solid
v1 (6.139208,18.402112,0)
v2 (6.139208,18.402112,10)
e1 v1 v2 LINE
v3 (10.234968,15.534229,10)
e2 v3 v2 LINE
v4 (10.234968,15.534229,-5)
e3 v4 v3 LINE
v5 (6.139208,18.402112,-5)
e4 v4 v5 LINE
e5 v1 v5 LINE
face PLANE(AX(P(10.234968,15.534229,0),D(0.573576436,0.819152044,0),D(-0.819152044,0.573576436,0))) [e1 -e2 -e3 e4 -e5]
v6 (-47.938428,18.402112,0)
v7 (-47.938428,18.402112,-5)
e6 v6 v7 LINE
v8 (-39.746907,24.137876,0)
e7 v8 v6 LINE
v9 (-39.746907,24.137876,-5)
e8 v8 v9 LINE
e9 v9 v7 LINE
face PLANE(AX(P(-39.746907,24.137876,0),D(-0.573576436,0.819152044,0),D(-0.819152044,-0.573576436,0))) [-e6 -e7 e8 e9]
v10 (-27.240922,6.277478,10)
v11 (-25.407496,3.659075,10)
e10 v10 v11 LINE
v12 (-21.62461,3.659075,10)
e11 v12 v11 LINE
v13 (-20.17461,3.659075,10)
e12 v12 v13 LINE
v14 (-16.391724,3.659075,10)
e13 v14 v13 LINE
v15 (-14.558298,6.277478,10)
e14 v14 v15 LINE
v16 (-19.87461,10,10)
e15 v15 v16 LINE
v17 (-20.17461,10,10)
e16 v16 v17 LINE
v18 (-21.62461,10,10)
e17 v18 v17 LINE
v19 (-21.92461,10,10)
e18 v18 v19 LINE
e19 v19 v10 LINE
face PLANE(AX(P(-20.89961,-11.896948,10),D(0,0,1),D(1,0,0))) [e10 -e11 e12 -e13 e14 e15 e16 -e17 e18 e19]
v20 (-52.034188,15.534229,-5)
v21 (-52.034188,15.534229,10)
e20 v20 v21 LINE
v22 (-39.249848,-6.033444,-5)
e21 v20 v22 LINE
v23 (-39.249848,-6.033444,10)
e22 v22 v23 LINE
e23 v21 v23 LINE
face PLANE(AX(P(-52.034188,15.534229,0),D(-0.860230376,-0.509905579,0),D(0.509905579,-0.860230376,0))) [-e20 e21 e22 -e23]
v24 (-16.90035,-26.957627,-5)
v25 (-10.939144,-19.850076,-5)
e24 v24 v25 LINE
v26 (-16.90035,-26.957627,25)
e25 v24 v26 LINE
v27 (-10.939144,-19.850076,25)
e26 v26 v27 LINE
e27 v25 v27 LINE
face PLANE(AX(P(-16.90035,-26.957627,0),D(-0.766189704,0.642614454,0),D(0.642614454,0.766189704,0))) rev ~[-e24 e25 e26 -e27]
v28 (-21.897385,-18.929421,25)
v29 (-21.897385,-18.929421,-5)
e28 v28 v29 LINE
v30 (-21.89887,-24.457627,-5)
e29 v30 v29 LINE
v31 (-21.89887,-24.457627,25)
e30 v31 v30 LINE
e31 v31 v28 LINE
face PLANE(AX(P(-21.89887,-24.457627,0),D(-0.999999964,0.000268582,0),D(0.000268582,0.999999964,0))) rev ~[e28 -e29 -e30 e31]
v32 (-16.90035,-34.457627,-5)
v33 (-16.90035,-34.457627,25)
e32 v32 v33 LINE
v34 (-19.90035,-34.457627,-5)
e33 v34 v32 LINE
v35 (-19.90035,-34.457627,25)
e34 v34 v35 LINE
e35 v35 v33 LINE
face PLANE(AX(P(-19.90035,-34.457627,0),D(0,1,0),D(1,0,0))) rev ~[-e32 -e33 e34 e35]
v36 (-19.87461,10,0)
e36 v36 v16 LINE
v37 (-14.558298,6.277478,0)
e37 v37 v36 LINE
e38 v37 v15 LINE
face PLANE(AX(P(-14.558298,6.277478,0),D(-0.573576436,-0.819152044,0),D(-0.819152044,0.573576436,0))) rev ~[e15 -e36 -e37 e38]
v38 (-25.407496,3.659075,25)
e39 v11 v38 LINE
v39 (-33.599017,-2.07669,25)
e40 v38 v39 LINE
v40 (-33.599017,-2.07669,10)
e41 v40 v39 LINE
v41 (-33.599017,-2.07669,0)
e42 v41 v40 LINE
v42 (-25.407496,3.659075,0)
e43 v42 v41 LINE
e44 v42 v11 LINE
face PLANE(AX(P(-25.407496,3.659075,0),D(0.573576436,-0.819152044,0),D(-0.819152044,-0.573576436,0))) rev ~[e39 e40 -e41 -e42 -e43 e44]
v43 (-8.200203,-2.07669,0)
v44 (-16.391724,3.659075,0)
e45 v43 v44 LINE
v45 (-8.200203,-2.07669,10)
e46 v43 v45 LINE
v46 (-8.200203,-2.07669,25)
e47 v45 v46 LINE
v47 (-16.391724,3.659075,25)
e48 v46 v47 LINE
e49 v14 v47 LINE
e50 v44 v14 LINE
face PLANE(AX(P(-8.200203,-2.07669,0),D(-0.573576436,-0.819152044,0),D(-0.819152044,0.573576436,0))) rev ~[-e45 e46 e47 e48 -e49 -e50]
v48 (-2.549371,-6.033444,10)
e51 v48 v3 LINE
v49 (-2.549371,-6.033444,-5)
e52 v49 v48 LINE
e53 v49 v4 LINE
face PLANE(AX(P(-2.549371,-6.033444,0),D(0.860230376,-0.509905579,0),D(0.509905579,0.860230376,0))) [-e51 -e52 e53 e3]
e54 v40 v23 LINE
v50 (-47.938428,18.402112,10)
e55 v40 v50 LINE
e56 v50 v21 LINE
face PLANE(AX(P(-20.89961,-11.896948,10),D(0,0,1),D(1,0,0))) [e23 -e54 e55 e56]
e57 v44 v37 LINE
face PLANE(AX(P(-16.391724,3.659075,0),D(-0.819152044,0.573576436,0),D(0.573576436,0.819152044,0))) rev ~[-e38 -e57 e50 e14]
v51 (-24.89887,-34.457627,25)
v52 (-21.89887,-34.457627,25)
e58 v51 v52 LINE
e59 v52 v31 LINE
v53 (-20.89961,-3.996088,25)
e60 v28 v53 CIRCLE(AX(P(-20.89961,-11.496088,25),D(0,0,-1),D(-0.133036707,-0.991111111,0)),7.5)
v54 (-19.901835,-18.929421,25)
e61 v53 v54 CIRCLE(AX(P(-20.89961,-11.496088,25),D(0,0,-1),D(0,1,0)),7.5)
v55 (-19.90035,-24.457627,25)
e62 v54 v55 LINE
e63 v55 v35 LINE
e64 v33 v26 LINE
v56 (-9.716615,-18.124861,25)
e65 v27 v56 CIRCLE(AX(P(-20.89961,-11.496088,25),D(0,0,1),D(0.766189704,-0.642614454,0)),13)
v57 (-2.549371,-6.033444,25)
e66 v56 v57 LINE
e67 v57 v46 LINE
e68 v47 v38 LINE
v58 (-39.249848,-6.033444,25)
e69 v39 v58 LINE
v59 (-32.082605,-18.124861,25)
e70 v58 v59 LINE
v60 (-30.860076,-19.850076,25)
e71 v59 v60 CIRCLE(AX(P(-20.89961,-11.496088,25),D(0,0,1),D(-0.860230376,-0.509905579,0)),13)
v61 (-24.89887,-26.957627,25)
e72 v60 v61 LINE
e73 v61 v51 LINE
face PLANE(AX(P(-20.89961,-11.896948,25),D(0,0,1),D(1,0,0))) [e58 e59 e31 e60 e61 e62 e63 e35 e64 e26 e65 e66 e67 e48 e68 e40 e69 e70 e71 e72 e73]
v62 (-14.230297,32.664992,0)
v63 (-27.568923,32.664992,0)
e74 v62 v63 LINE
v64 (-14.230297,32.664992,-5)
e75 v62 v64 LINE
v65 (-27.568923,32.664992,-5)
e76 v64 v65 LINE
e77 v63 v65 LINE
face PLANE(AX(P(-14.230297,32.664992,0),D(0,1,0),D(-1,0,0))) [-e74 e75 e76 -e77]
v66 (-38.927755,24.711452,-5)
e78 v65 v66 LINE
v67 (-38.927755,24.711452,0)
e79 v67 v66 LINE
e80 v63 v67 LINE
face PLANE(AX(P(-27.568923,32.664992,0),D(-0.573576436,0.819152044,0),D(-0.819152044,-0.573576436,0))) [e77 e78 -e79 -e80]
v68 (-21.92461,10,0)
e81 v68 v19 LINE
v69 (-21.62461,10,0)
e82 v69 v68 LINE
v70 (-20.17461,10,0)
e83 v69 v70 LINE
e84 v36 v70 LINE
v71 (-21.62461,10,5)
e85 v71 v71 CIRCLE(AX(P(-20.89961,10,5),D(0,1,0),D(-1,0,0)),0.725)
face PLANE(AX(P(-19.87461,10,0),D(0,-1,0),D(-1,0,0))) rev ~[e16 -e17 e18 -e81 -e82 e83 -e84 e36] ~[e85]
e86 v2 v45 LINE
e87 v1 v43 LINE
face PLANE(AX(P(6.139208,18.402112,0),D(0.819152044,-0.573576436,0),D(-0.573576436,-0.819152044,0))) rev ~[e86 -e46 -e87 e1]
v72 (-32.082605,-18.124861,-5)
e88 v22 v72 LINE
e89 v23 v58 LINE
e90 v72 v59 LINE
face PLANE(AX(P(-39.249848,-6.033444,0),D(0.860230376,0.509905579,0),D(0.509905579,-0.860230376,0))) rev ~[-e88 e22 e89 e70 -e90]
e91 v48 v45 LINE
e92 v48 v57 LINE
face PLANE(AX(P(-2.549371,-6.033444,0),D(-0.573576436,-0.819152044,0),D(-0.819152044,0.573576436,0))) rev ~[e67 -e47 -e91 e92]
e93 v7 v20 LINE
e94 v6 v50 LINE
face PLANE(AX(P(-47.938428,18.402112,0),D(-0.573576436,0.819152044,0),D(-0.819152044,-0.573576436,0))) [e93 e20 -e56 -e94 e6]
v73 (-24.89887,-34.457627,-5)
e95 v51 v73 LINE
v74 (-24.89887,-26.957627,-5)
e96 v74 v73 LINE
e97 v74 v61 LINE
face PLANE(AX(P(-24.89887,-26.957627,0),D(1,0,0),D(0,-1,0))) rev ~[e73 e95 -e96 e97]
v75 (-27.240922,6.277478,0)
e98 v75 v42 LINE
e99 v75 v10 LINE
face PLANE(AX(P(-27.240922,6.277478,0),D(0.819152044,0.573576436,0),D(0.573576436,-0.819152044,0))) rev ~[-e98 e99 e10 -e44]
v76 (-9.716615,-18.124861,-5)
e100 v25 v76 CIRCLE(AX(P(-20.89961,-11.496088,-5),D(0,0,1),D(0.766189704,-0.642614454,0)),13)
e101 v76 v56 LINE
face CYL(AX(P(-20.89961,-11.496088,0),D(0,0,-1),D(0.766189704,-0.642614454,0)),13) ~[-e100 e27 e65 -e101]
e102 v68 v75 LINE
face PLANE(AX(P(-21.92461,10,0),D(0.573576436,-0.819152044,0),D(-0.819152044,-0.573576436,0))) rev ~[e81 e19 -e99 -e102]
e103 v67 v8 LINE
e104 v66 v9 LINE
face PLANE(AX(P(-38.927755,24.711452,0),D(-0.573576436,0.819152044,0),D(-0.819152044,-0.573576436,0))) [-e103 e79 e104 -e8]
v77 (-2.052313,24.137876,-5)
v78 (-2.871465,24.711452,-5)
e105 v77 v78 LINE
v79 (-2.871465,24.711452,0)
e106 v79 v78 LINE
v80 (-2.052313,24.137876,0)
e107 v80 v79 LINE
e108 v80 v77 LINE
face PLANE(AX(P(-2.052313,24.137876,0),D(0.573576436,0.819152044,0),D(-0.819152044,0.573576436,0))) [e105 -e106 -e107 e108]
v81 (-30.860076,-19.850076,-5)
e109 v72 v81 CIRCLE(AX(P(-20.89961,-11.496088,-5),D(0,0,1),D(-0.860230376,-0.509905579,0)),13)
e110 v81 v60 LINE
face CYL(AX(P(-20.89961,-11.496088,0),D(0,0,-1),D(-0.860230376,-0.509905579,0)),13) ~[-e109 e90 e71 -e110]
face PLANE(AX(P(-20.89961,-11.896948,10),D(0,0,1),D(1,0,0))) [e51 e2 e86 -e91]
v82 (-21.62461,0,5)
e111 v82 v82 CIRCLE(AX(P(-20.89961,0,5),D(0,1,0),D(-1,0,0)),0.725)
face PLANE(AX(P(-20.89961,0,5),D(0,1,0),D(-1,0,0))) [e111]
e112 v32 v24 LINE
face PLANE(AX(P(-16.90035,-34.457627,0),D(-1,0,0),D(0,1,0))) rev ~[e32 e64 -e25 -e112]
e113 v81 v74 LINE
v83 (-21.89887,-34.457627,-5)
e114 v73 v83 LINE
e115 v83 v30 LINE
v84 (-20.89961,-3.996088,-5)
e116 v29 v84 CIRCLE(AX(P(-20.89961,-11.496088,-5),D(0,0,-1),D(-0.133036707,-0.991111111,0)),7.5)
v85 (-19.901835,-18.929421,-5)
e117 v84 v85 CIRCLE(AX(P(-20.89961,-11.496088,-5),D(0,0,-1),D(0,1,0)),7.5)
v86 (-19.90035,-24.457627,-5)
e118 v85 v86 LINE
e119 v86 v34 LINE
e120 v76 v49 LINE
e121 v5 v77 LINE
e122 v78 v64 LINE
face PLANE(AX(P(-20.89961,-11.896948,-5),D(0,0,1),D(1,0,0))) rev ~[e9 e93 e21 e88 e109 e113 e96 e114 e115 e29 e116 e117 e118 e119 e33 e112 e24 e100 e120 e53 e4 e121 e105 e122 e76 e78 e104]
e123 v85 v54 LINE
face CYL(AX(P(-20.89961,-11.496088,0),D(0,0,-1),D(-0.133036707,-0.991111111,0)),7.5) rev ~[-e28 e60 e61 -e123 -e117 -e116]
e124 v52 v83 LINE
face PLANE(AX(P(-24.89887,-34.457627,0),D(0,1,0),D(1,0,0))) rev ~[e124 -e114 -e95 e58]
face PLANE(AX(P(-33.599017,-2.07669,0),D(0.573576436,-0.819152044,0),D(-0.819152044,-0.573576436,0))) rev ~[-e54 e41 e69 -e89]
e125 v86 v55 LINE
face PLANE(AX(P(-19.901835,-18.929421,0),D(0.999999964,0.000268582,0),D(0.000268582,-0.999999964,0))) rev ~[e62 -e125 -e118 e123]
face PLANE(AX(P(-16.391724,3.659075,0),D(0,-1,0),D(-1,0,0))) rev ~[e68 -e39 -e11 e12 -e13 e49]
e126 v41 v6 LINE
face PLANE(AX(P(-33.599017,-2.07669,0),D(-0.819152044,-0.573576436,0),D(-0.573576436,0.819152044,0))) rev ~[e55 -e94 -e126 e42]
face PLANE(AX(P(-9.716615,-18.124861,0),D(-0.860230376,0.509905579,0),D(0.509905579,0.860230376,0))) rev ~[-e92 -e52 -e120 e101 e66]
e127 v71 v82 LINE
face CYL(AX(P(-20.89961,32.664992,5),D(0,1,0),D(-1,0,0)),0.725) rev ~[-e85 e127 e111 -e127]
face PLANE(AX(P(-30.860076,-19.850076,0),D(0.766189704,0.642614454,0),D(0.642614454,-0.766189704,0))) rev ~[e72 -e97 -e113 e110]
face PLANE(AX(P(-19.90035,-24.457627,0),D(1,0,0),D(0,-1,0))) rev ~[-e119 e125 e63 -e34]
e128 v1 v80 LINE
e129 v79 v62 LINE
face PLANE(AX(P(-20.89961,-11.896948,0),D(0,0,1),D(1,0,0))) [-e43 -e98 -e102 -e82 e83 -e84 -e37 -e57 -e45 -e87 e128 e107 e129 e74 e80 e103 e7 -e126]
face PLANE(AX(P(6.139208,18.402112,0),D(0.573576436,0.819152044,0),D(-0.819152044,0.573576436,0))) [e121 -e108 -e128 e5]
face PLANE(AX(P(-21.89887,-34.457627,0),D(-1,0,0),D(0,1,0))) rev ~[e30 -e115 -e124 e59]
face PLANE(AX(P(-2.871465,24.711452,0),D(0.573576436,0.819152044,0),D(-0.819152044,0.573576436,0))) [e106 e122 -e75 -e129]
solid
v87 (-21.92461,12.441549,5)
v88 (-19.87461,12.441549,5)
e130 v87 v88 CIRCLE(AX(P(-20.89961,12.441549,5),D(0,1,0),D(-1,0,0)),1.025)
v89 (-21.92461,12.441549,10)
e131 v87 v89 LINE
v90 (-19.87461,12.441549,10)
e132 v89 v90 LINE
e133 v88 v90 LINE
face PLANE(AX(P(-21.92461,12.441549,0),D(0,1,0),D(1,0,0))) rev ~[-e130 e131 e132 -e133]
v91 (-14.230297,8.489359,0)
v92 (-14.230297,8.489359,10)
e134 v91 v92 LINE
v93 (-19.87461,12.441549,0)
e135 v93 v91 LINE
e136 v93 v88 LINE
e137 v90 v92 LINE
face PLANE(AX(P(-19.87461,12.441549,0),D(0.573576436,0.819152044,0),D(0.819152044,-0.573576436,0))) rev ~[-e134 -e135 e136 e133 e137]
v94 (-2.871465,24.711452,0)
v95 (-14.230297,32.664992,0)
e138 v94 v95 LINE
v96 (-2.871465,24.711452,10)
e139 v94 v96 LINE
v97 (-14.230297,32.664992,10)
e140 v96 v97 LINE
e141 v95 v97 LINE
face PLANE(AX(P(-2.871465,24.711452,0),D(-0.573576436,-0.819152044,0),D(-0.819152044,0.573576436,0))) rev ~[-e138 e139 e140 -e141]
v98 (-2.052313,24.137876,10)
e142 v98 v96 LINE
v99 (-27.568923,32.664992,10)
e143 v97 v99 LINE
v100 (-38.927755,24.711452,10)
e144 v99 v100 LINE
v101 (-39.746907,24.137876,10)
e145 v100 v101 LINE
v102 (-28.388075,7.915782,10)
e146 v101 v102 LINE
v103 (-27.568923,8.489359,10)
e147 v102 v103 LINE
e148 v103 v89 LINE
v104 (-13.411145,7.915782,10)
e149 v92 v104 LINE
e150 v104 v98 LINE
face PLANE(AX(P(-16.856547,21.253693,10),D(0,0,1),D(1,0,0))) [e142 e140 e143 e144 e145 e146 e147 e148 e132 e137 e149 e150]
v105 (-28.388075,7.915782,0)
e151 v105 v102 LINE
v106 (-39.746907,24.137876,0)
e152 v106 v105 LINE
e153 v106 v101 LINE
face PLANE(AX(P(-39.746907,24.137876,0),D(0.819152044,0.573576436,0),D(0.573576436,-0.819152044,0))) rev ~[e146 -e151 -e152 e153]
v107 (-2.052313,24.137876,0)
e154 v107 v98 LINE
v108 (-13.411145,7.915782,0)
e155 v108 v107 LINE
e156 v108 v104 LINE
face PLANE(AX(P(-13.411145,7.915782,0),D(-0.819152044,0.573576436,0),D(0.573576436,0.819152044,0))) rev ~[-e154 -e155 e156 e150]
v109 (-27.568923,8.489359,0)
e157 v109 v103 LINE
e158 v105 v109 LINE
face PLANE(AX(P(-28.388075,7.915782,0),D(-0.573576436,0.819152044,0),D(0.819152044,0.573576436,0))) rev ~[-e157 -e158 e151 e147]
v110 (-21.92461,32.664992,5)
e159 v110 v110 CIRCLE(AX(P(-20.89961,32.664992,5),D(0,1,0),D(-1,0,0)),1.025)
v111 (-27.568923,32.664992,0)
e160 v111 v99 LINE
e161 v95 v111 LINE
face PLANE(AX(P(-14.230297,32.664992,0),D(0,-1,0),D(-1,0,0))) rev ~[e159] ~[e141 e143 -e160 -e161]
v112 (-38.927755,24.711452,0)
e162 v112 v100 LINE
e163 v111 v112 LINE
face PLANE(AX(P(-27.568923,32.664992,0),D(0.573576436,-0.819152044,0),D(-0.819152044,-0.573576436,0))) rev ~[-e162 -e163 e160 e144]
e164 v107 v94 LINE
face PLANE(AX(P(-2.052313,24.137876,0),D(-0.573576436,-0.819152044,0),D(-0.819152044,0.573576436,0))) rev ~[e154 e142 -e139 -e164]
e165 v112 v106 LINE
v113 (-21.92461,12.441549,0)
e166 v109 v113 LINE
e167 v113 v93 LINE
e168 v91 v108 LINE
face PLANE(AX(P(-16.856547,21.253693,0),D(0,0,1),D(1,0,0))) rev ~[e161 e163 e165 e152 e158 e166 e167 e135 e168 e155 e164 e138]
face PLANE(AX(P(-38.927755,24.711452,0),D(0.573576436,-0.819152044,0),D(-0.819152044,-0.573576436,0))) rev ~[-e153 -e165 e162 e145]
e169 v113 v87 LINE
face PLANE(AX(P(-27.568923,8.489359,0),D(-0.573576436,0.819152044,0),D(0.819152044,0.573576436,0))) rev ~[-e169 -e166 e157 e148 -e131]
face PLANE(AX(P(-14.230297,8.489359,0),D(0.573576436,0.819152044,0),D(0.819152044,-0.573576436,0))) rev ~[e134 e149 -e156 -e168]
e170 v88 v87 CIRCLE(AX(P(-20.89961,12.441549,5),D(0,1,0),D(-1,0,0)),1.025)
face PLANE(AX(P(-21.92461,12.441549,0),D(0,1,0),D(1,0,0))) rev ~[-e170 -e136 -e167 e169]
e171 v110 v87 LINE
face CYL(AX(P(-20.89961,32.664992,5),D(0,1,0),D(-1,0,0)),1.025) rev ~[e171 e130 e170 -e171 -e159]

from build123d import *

# Parameters (mm, degrees)
F1_W     = 1.45
F1_H     = 6.3409252325
F2_DEPTH = 5
F3_DEPTH = 10
F5_DEPTH = 25
F6_DEPTH = 10
F4_R     = 0.725
F7_DEPTH = 32.664992266
F4_R_2   = 1.025
F8_DEPTH = 20.2234430885


# Not quite as in the source:
# - a feature names something its author has since deleted; it is built from what else it names


with BuildPart() as f2:
    # F1 (on Top) → F2 (new body)
    with BuildSketch(Plane.XY):
        with BuildLine():
            ThreePointArc((-21.8973851311, -18.9294214119), (-28.3829246015, -10.9960880786), (-20.899609828, -3.9960880786))
            ThreePointArc((-20.899609828, -3.9960880786), (-13.4162950544, -10.9960880786), (-19.9018345249, -18.9294214119))
            Line((-19.9018345249, -18.9294214119), (-19.9003497467, -24.4576265402))
            ThreePointArc((-19.9003497467, -24.4576265402), (-18.3828834375, -24.250149717), (-16.9003497467, -23.8656442066))
            ThreePointArc((-16.9003497467, -23.8656442066), (-13.6367119074, -22.2780319569), (-10.9391436703, -19.8500759839))
            ThreePointArc((-10.9391436703, -19.8500759839), (-10.2927451499, -19.0123651957), (-9.7166149372, -18.12486061))
            ThreePointArc((-9.7166149372, -18.12486061), (-9.4290474991, -5.3783924455), (-20.174609828, 1.4836798315))
            Line((-20.174609828, 1.4836798315), (-20.174609828, 0))
            Line((-20.174609828, 0), (-20.899609828, 0))
            Line((-20.899609828, 0), (-21.624609828, 0))
            Line((-21.624609828, 0), (-21.624609828, 1.4836798315))
            ThreePointArc((-21.624609828, 1.4836798315), (-32.3701721569, -5.3783924455), (-32.0826047188, -18.12486061))
            ThreePointArc((-32.0826047188, -18.12486061), (-31.5064745061, -19.0123651957), (-30.8600759857, -19.8500759839))
            ThreePointArc((-30.8600759857, -19.8500759839), (-28.1625077486, -22.2780319569), (-24.8988699093, -23.8656442066))
            ThreePointArc((-24.8988699093, -23.8656442066), (-23.4163362185, -24.250149717), (-21.8988699093, -24.4576265402))
            Line((-21.8988699093, -24.4576265402), (-21.8973851311, -18.9294214119))
        make_face()
        with BuildLine():
            Line((-21.8988699093, -34.4576265402), (-21.8988699093, -24.4576265402))
            ThreePointArc((-21.8988699093, -24.4576265402), (-23.4163362185, -24.250149717), (-24.8988699093, -23.8656442066))
            Line((-24.8988699093, -23.8656442066), (-24.8988699093, -26.9576265402))
            Line((-24.8988699093, -26.9576265402), (-24.8988699093, -34.4576265402))
            Line((-24.8988699093, -34.4576265402), (-21.8988699093, -34.4576265402))
        make_face()
        with BuildLine():
            ThreePointArc((-16.9003497467, -23.8656442066), (-18.3828834375, -24.250149717), (-19.9003497467, -24.4576265402))
            Line((-19.9003497467, -24.4576265402), (-19.9003497467, -34.4576265402))
            Line((-19.9003497467, -34.4576265402), (-16.9003497467, -34.4576265402))
            Line((-16.9003497467, -34.4576265402), (-16.9003497467, -26.9576265402))
            Line((-16.9003497467, -26.9576265402), (-16.9003497467, -23.8656442066))
        make_face()
        with BuildLine():
            Line((-24.8988699093, -26.9576265402), (-24.8988699093, -23.8656442066))
            ThreePointArc((-24.8988699093, -23.8656442066), (-28.1625077486, -22.2780319569), (-30.8600759857, -19.8500759839))
            Line((-30.8600759857, -19.8500759839), (-24.8988699093, -26.9576265402))
        make_face()
        with BuildLine():
            ThreePointArc((-10.9391436703, -19.8500759839), (-13.6367119074, -22.2780319569), (-16.9003497467, -23.8656442066))
            Line((-16.9003497467, -23.8656442066), (-16.9003497467, -26.9576265402))
            Line((-16.9003497467, -26.9576265402), (-10.9391436703, -19.8500759839))
        make_face()
        with BuildLine():
            Line((-39.2498481908, -6.0334444768), (-32.0826047188, -18.12486061))
            ThreePointArc((-32.0826047188, -18.12486061), (-32.3701721569, -5.3783924455), (-21.624609828, 1.4836798315))
            Line((-21.624609828, 1.4836798315), (-21.624609828, 3.6590747675))
            Line((-21.624609828, 3.6590747675), (-25.4074961518, 3.6590747675))
            Line((-25.4074961518, 3.6590747675), (-33.5990165947, -2.076689596))
            Line((-33.5990165947, -2.076689596), (-39.2498481908, -6.0334444768))
        make_face()
        with BuildLine():
            ThreePointArc((-20.174609828, 1.4836798315), (-9.4290474991, -5.3783924455), (-9.7166149372, -18.12486061))
            Line((-9.7166149372, -18.12486061), (-2.5493714652, -6.0334444768))
            Line((-2.5493714652, -6.0334444768), (-8.2002030613, -2.076689596))
            Line((-8.2002030613, -2.076689596), (-16.3917235042, 3.6590747675))
            Line((-16.3917235042, 3.6590747675), (-20.174609828, 3.6590747675))
            Line((-20.174609828, 3.6590747675), (-20.174609828, 1.4836798315))
        make_face()
        with BuildLine():
            Line((-21.624609828, 3.6590747675), (-21.624609828, 1.4836798315))
            ThreePointArc((-21.624609828, 1.4836798315), (-21.2622509514, 1.4988529145), (-20.899609828, 1.5039119214))
            ThreePointArc((-20.899609828, 1.5039119214), (-20.5369687046, 1.4988529145), (-20.174609828, 1.4836798315))
            Line((-20.174609828, 1.4836798315), (-20.174609828, 3.6590747675))
            Line((-20.174609828, 3.6590747675), (-21.624609828, 3.6590747675))
        make_face()
        with BuildLine():
            ThreePointArc((-20.899609828, 1.5039119214), (-21.2622509514, 1.4988529145), (-21.624609828, 1.4836798315))
            Line((-21.624609828, 1.4836798315), (-21.624609828, 0))
            Line((-21.624609828, 0), (-20.899609828, 0))
            Line((-20.899609828, 0), (-20.174609828, 0))
            Line((-20.174609828, 0), (-20.174609828, 1.4836798315))
            ThreePointArc((-20.174609828, 1.4836798315), (-20.5369687046, 1.4988529145), (-20.899609828, 1.5039119214))
        make_face()
        Polygon((-52.0341877249, 15.5342293294), (-39.2498481908, -6.0334444768), (-33.5990165947, -2.076689596), (-47.9384275035, 18.4021115112), align=None)
        Polygon((-8.2002030613, -2.076689596), (-2.5493714652, -6.0334444768), (10.2349680689, 15.5342293294), (6.1392078475, 18.4021115112), align=None)
        Polygon((-25.4074961518, 3.6590747675), (-21.624609828, 3.6590747675), (-21.624609828, 10), (-21.924609828, 10), (-27.2409219547, 6.2774781734), align=None)
        with Locations((-20.899609828, 6.8295373837)):
            Rectangle(F1_W, F1_H)
        Polygon((-47.9384275035, 18.4021115112), (-33.5990165947, -2.076689596), (-25.4074961518, 3.6590747675), (-27.2409219547, 6.2774781734), (-28.3880748274, 7.915782262), (-39.7469070606, 24.1378758747), align=None)
        Polygon((-16.3917235042, 3.6590747675), (-8.2002030613, -2.076689596), (6.1392078475, 18.4021115112), (-2.0523125954, 24.1378758747), (-13.4111448286, 7.915782262), (-14.5582977013, 6.2774781734), align=None)
        Polygon((-20.174609828, 10), (-20.174609828, 3.6590747675), (-16.3917235042, 3.6590747675), (-14.5582977013, 6.2774781734), (-19.874609828, 10), align=None)
        Polygon((-21.924609828, 10), (-21.624609828, 10), (-20.174609828, 10), (-19.874609828, 10), (-19.874609828, 12.4415491775), (-21.924609828, 12.4415491775), align=None)
        Polygon((-27.2409219547, 6.2774781734), (-21.924609828, 10), (-21.924609828, 12.4415491775), (-27.5689227831, 8.4893586983), (-28.3880748274, 7.915782262), align=None)
        Polygon((-38.9277550163, 24.7114523111), (-39.7469070606, 24.1378758747), (-28.3880748274, 7.915782262), (-27.5689227831, 8.4893586983), (-27.5689227831, 32.664992266), align=None)
        Polygon((-13.4111448286, 7.915782262), (-2.0523125954, 24.1378758747), (-2.8714646397, 24.7114523111), (-14.2302968729, 32.664992266), (-14.2302968729, 8.4893586983), align=None)
        Polygon((-19.874609828, 10), (-14.5582977013, 6.2774781734), (-13.4111448286, 7.915782262), (-14.2302968729, 8.4893586983), (-19.874609828, 12.4415491775), align=None)
        Polygon((-27.5689227831, 8.4893586983), (-21.924609828, 12.4415491775), (-21.924609828, 32.664992266), (-27.5689227831, 32.664992266), align=None)
        Polygon((-21.924609828, 32.664992266), (-21.924609828, 12.4415491775), (-19.874609828, 12.4415491775), (-19.874609828, 32.664992266), (-20.899609828, 32.664992266), align=None)
        Polygon((-19.874609828, 32.664992266), (-19.874609828, 12.4415491775), (-14.2302968729, 8.4893586983), (-14.2302968729, 32.664992266), align=None)
    extrude(amount=-F2_DEPTH)

    # F1 (on Top) → F5 (join)
    with BuildSketch(Plane.XY):
        with BuildLine():
            ThreePointArc((-21.8973851311, -18.9294214119), (-28.3829246015, -10.9960880786), (-20.899609828, -3.9960880786))
            ThreePointArc((-20.899609828, -3.9960880786), (-13.4162950544, -10.9960880786), (-19.9018345249, -18.9294214119))
            Line((-19.9018345249, -18.9294214119), (-19.9003497467, -24.4576265402))
            ThreePointArc((-19.9003497467, -24.4576265402), (-18.3828834375, -24.250149717), (-16.9003497467, -23.8656442066))
            ThreePointArc((-16.9003497467, -23.8656442066), (-13.6367119074, -22.2780319569), (-10.9391436703, -19.8500759839))
            ThreePointArc((-10.9391436703, -19.8500759839), (-10.2927451499, -19.0123651957), (-9.7166149372, -18.12486061))
            ThreePointArc((-9.7166149372, -18.12486061), (-9.4290474991, -5.3783924455), (-20.174609828, 1.4836798315))
            Line((-20.174609828, 1.4836798315), (-20.174609828, 0))
            Line((-20.174609828, 0), (-20.899609828, 0))
            Line((-20.899609828, 0), (-21.624609828, 0))
            Line((-21.624609828, 0), (-21.624609828, 1.4836798315))
            ThreePointArc((-21.624609828, 1.4836798315), (-32.3701721569, -5.3783924455), (-32.0826047188, -18.12486061))
            ThreePointArc((-32.0826047188, -18.12486061), (-31.5064745061, -19.0123651957), (-30.8600759857, -19.8500759839))
            ThreePointArc((-30.8600759857, -19.8500759839), (-28.1625077486, -22.2780319569), (-24.8988699093, -23.8656442066))
            ThreePointArc((-24.8988699093, -23.8656442066), (-23.4163362185, -24.250149717), (-21.8988699093, -24.4576265402))
            Line((-21.8988699093, -24.4576265402), (-21.8973851311, -18.9294214119))
        make_face()
        with BuildLine():
            Line((-21.8988699093, -34.4576265402), (-21.8988699093, -24.4576265402))
            ThreePointArc((-21.8988699093, -24.4576265402), (-23.4163362185, -24.250149717), (-24.8988699093, -23.8656442066))
            Line((-24.8988699093, -23.8656442066), (-24.8988699093, -26.9576265402))
            Line((-24.8988699093, -26.9576265402), (-24.8988699093, -34.4576265402))
            Line((-24.8988699093, -34.4576265402), (-21.8988699093, -34.4576265402))
        make_face()
        with BuildLine():
            ThreePointArc((-16.9003497467, -23.8656442066), (-18.3828834375, -24.250149717), (-19.9003497467, -24.4576265402))
            Line((-19.9003497467, -24.4576265402), (-19.9003497467, -34.4576265402))
            Line((-19.9003497467, -34.4576265402), (-16.9003497467, -34.4576265402))
            Line((-16.9003497467, -34.4576265402), (-16.9003497467, -26.9576265402))
            Line((-16.9003497467, -26.9576265402), (-16.9003497467, -23.8656442066))
        make_face()
        with BuildLine():
            Line((-24.8988699093, -26.9576265402), (-24.8988699093, -23.8656442066))
            ThreePointArc((-24.8988699093, -23.8656442066), (-28.1625077486, -22.2780319569), (-30.8600759857, -19.8500759839))
            Line((-30.8600759857, -19.8500759839), (-24.8988699093, -26.9576265402))
        make_face()
        with BuildLine():
            ThreePointArc((-10.9391436703, -19.8500759839), (-13.6367119074, -22.2780319569), (-16.9003497467, -23.8656442066))
            Line((-16.9003497467, -23.8656442066), (-16.9003497467, -26.9576265402))
            Line((-16.9003497467, -26.9576265402), (-10.9391436703, -19.8500759839))
        make_face()
        with BuildLine():
            Line((-39.2498481908, -6.0334444768), (-32.0826047188, -18.12486061))
            ThreePointArc((-32.0826047188, -18.12486061), (-32.3701721569, -5.3783924455), (-21.624609828, 1.4836798315))
            Line((-21.624609828, 1.4836798315), (-21.624609828, 3.6590747675))
            Line((-21.624609828, 3.6590747675), (-25.4074961518, 3.6590747675))
            Line((-25.4074961518, 3.6590747675), (-33.5990165947, -2.076689596))
            Line((-33.5990165947, -2.076689596), (-39.2498481908, -6.0334444768))
        make_face()
        with BuildLine():
            ThreePointArc((-20.174609828, 1.4836798315), (-9.4290474991, -5.3783924455), (-9.7166149372, -18.12486061))
            Line((-9.7166149372, -18.12486061), (-2.5493714652, -6.0334444768))
            Line((-2.5493714652, -6.0334444768), (-8.2002030613, -2.076689596))
            Line((-8.2002030613, -2.076689596), (-16.3917235042, 3.6590747675))
            Line((-16.3917235042, 3.6590747675), (-20.174609828, 3.6590747675))
            Line((-20.174609828, 3.6590747675), (-20.174609828, 1.4836798315))
        make_face()
        with BuildLine():
            Line((-21.624609828, 3.6590747675), (-21.624609828, 1.4836798315))
            ThreePointArc((-21.624609828, 1.4836798315), (-21.2622509514, 1.4988529145), (-20.899609828, 1.5039119214))
            ThreePointArc((-20.899609828, 1.5039119214), (-20.5369687046, 1.4988529145), (-20.174609828, 1.4836798315))
            Line((-20.174609828, 1.4836798315), (-20.174609828, 3.6590747675))
            Line((-20.174609828, 3.6590747675), (-21.624609828, 3.6590747675))
        make_face()
        with BuildLine():
            ThreePointArc((-20.899609828, 1.5039119214), (-21.2622509514, 1.4988529145), (-21.624609828, 1.4836798315))
            Line((-21.624609828, 1.4836798315), (-21.624609828, 0))
            Line((-21.624609828, 0), (-20.899609828, 0))
            Line((-20.899609828, 0), (-20.174609828, 0))
            Line((-20.174609828, 0), (-20.174609828, 1.4836798315))
            ThreePointArc((-20.174609828, 1.4836798315), (-20.5369687046, 1.4988529145), (-20.899609828, 1.5039119214))
        make_face()
    extrude(amount=F5_DEPTH)

    # F1 (on Top) → F6 (join)
    with BuildSketch(Plane.XY):
        with BuildLine():
            ThreePointArc((-21.8973851311, -18.9294214119), (-28.3829246015, -10.9960880786), (-20.899609828, -3.9960880786))
            ThreePointArc((-20.899609828, -3.9960880786), (-13.4162950544, -10.9960880786), (-19.9018345249, -18.9294214119))
            Line((-19.9018345249, -18.9294214119), (-19.9003497467, -24.4576265402))
            ThreePointArc((-19.9003497467, -24.4576265402), (-18.3828834375, -24.250149717), (-16.9003497467, -23.8656442066))
            ThreePointArc((-16.9003497467, -23.8656442066), (-13.6367119074, -22.2780319569), (-10.9391436703, -19.8500759839))
            ThreePointArc((-10.9391436703, -19.8500759839), (-10.2927451499, -19.0123651957), (-9.7166149372, -18.12486061))
            ThreePointArc((-9.7166149372, -18.12486061), (-9.4290474991, -5.3783924455), (-20.174609828, 1.4836798315))
            Line((-20.174609828, 1.4836798315), (-20.174609828, 0))
            Line((-20.174609828, 0), (-20.899609828, 0))
            Line((-20.899609828, 0), (-21.624609828, 0))
            Line((-21.624609828, 0), (-21.624609828, 1.4836798315))
            ThreePointArc((-21.624609828, 1.4836798315), (-32.3701721569, -5.3783924455), (-32.0826047188, -18.12486061))
            ThreePointArc((-32.0826047188, -18.12486061), (-31.5064745061, -19.0123651957), (-30.8600759857, -19.8500759839))
            ThreePointArc((-30.8600759857, -19.8500759839), (-28.1625077486, -22.2780319569), (-24.8988699093, -23.8656442066))
            ThreePointArc((-24.8988699093, -23.8656442066), (-23.4163362185, -24.250149717), (-21.8988699093, -24.4576265402))
            Line((-21.8988699093, -24.4576265402), (-21.8973851311, -18.9294214119))
        make_face()
        with BuildLine():
            Line((-24.8988699093, -26.9576265402), (-24.8988699093, -23.8656442066))
            ThreePointArc((-24.8988699093, -23.8656442066), (-28.1625077486, -22.2780319569), (-30.8600759857, -19.8500759839))
            Line((-30.8600759857, -19.8500759839), (-24.8988699093, -26.9576265402))
        make_face()
        with BuildLine():
            Line((-21.8988699093, -34.4576265402), (-21.8988699093, -24.4576265402))
            ThreePointArc((-21.8988699093, -24.4576265402), (-23.4163362185, -24.250149717), (-24.8988699093, -23.8656442066))
            Line((-24.8988699093, -23.8656442066), (-24.8988699093, -26.9576265402))
            Line((-24.8988699093, -26.9576265402), (-24.8988699093, -34.4576265402))
            Line((-24.8988699093, -34.4576265402), (-21.8988699093, -34.4576265402))
        make_face()
        with BuildLine():
            ThreePointArc((-16.9003497467, -23.8656442066), (-18.3828834375, -24.250149717), (-19.9003497467, -24.4576265402))
            Line((-19.9003497467, -24.4576265402), (-19.9003497467, -34.4576265402))
            Line((-19.9003497467, -34.4576265402), (-16.9003497467, -34.4576265402))
            Line((-16.9003497467, -34.4576265402), (-16.9003497467, -26.9576265402))
            Line((-16.9003497467, -26.9576265402), (-16.9003497467, -23.8656442066))
        make_face()
        with BuildLine():
            ThreePointArc((-10.9391436703, -19.8500759839), (-13.6367119074, -22.2780319569), (-16.9003497467, -23.8656442066))
            Line((-16.9003497467, -23.8656442066), (-16.9003497467, -26.9576265402))
            Line((-16.9003497467, -26.9576265402), (-10.9391436703, -19.8500759839))
        make_face()
        Polygon((-52.0341877249, 15.5342293294), (-39.2498481908, -6.0334444768), (-33.5990165947, -2.076689596), (-47.9384275035, 18.4021115112), align=None)
        Polygon((-8.2002030613, -2.076689596), (-2.5493714652, -6.0334444768), (10.2349680689, 15.5342293294), (6.1392078475, 18.4021115112), align=None)
        with BuildLine():
            Line((-39.2498481908, -6.0334444768), (-32.0826047188, -18.12486061))
            ThreePointArc((-32.0826047188, -18.12486061), (-32.3701721569, -5.3783924455), (-21.624609828, 1.4836798315))
            Line((-21.624609828, 1.4836798315), (-21.624609828, 3.6590747675))
            Line((-21.624609828, 3.6590747675), (-25.4074961518, 3.6590747675))
            Line((-25.4074961518, 3.6590747675), (-33.5990165947, -2.076689596))
            Line((-33.5990165947, -2.076689596), (-39.2498481908, -6.0334444768))
        make_face()
        with BuildLine():
            ThreePointArc((-20.174609828, 1.4836798315), (-9.4290474991, -5.3783924455), (-9.7166149372, -18.12486061))
            Line((-9.7166149372, -18.12486061), (-2.5493714652, -6.0334444768))
            Line((-2.5493714652, -6.0334444768), (-8.2002030613, -2.076689596))
            Line((-8.2002030613, -2.076689596), (-16.3917235042, 3.6590747675))
            Line((-16.3917235042, 3.6590747675), (-20.174609828, 3.6590747675))
            Line((-20.174609828, 3.6590747675), (-20.174609828, 1.4836798315))
        make_face()
        with BuildLine():
            ThreePointArc((-20.899609828, 1.5039119214), (-21.2622509514, 1.4988529145), (-21.624609828, 1.4836798315))
            Line((-21.624609828, 1.4836798315), (-21.624609828, 0))
            Line((-21.624609828, 0), (-20.899609828, 0))
            Line((-20.899609828, 0), (-20.174609828, 0))
            Line((-20.174609828, 0), (-20.174609828, 1.4836798315))
            ThreePointArc((-20.174609828, 1.4836798315), (-20.5369687046, 1.4988529145), (-20.899609828, 1.5039119214))
        make_face()
        Polygon((-20.174609828, 10), (-20.174609828, 3.6590747675), (-16.3917235042, 3.6590747675), (-14.5582977013, 6.2774781734), (-19.874609828, 10), align=None)
        Polygon((-25.4074961518, 3.6590747675), (-21.624609828, 3.6590747675), (-21.624609828, 10), (-21.924609828, 10), (-27.2409219547, 6.2774781734), align=None)
        with Locations((-20.899609828, 6.8295373837)):
            Rectangle(F1_W, F1_H)
    extrude(amount=F6_DEPTH)


with BuildPart() as f3:
    # F1 (on Top) → F3 (new body)
    with BuildSketch(Plane.XY):
        Polygon((-19.874609828, 32.664992266), (-19.874609828, 12.4415491775), (-14.2302968729, 8.4893586983), (-14.2302968729, 32.664992266), align=None)
        Polygon((-27.5689227831, 8.4893586983), (-21.924609828, 12.4415491775), (-21.924609828, 32.664992266), (-27.5689227831, 32.664992266), align=None)
        Polygon((-38.9277550163, 24.7114523111), (-39.7469070606, 24.1378758747), (-28.3880748274, 7.915782262), (-27.5689227831, 8.4893586983), (-27.5689227831, 32.664992266), align=None)
        Polygon((-13.4111448286, 7.915782262), (-2.0523125954, 24.1378758747), (-2.8714646397, 24.7114523111), (-14.2302968729, 32.664992266), (-14.2302968729, 8.4893586983), align=None)
        Polygon((-21.924609828, 32.664992266), (-21.924609828, 12.4415491775), (-19.874609828, 12.4415491775), (-19.874609828, 32.664992266), (-20.899609828, 32.664992266), align=None)
    extrude(amount=F3_DEPTH)


with BuildPart() as f7_tool:
    # F4 (on face) → F7 (new body, through all)
    with BuildSketch(Plane(origin=(0, 32.664992266, 0), x_dir=(-1, 0, 0), z_dir=(0, 1, 0))):
        with Locations((20.899609828, 5)):
            Circle(F4_R)
    extrude(amount=-F7_DEPTH)


with BuildPart() as f2_1:
    add(f2.part)

    # F7: cut by f7_tool
    add(f7_tool.part, mode=Mode.SUBTRACT)


with BuildPart() as f3_1:
    add(f3.part)

    # F7: cut by f7_tool
    add(f7_tool.part, mode=Mode.SUBTRACT)

    # F4 (on face) → F8 (cut, through all)
    with BuildSketch(Plane(origin=(0, 32.664992266, 0), x_dir=(-1, 0, 0), z_dir=(0, 1, 0))):
        with Locations((20.899609828, 5)):
            Circle(F4_R_2)
        with Locations((20.899609828, 5)):
            Circle(F4_R, mode=Mode.SUBTRACT)
    extrude(amount=-F8_DEPTH, mode=Mode.SUBTRACT)


solid = Compound([f2_1.part, f3_1.part])
